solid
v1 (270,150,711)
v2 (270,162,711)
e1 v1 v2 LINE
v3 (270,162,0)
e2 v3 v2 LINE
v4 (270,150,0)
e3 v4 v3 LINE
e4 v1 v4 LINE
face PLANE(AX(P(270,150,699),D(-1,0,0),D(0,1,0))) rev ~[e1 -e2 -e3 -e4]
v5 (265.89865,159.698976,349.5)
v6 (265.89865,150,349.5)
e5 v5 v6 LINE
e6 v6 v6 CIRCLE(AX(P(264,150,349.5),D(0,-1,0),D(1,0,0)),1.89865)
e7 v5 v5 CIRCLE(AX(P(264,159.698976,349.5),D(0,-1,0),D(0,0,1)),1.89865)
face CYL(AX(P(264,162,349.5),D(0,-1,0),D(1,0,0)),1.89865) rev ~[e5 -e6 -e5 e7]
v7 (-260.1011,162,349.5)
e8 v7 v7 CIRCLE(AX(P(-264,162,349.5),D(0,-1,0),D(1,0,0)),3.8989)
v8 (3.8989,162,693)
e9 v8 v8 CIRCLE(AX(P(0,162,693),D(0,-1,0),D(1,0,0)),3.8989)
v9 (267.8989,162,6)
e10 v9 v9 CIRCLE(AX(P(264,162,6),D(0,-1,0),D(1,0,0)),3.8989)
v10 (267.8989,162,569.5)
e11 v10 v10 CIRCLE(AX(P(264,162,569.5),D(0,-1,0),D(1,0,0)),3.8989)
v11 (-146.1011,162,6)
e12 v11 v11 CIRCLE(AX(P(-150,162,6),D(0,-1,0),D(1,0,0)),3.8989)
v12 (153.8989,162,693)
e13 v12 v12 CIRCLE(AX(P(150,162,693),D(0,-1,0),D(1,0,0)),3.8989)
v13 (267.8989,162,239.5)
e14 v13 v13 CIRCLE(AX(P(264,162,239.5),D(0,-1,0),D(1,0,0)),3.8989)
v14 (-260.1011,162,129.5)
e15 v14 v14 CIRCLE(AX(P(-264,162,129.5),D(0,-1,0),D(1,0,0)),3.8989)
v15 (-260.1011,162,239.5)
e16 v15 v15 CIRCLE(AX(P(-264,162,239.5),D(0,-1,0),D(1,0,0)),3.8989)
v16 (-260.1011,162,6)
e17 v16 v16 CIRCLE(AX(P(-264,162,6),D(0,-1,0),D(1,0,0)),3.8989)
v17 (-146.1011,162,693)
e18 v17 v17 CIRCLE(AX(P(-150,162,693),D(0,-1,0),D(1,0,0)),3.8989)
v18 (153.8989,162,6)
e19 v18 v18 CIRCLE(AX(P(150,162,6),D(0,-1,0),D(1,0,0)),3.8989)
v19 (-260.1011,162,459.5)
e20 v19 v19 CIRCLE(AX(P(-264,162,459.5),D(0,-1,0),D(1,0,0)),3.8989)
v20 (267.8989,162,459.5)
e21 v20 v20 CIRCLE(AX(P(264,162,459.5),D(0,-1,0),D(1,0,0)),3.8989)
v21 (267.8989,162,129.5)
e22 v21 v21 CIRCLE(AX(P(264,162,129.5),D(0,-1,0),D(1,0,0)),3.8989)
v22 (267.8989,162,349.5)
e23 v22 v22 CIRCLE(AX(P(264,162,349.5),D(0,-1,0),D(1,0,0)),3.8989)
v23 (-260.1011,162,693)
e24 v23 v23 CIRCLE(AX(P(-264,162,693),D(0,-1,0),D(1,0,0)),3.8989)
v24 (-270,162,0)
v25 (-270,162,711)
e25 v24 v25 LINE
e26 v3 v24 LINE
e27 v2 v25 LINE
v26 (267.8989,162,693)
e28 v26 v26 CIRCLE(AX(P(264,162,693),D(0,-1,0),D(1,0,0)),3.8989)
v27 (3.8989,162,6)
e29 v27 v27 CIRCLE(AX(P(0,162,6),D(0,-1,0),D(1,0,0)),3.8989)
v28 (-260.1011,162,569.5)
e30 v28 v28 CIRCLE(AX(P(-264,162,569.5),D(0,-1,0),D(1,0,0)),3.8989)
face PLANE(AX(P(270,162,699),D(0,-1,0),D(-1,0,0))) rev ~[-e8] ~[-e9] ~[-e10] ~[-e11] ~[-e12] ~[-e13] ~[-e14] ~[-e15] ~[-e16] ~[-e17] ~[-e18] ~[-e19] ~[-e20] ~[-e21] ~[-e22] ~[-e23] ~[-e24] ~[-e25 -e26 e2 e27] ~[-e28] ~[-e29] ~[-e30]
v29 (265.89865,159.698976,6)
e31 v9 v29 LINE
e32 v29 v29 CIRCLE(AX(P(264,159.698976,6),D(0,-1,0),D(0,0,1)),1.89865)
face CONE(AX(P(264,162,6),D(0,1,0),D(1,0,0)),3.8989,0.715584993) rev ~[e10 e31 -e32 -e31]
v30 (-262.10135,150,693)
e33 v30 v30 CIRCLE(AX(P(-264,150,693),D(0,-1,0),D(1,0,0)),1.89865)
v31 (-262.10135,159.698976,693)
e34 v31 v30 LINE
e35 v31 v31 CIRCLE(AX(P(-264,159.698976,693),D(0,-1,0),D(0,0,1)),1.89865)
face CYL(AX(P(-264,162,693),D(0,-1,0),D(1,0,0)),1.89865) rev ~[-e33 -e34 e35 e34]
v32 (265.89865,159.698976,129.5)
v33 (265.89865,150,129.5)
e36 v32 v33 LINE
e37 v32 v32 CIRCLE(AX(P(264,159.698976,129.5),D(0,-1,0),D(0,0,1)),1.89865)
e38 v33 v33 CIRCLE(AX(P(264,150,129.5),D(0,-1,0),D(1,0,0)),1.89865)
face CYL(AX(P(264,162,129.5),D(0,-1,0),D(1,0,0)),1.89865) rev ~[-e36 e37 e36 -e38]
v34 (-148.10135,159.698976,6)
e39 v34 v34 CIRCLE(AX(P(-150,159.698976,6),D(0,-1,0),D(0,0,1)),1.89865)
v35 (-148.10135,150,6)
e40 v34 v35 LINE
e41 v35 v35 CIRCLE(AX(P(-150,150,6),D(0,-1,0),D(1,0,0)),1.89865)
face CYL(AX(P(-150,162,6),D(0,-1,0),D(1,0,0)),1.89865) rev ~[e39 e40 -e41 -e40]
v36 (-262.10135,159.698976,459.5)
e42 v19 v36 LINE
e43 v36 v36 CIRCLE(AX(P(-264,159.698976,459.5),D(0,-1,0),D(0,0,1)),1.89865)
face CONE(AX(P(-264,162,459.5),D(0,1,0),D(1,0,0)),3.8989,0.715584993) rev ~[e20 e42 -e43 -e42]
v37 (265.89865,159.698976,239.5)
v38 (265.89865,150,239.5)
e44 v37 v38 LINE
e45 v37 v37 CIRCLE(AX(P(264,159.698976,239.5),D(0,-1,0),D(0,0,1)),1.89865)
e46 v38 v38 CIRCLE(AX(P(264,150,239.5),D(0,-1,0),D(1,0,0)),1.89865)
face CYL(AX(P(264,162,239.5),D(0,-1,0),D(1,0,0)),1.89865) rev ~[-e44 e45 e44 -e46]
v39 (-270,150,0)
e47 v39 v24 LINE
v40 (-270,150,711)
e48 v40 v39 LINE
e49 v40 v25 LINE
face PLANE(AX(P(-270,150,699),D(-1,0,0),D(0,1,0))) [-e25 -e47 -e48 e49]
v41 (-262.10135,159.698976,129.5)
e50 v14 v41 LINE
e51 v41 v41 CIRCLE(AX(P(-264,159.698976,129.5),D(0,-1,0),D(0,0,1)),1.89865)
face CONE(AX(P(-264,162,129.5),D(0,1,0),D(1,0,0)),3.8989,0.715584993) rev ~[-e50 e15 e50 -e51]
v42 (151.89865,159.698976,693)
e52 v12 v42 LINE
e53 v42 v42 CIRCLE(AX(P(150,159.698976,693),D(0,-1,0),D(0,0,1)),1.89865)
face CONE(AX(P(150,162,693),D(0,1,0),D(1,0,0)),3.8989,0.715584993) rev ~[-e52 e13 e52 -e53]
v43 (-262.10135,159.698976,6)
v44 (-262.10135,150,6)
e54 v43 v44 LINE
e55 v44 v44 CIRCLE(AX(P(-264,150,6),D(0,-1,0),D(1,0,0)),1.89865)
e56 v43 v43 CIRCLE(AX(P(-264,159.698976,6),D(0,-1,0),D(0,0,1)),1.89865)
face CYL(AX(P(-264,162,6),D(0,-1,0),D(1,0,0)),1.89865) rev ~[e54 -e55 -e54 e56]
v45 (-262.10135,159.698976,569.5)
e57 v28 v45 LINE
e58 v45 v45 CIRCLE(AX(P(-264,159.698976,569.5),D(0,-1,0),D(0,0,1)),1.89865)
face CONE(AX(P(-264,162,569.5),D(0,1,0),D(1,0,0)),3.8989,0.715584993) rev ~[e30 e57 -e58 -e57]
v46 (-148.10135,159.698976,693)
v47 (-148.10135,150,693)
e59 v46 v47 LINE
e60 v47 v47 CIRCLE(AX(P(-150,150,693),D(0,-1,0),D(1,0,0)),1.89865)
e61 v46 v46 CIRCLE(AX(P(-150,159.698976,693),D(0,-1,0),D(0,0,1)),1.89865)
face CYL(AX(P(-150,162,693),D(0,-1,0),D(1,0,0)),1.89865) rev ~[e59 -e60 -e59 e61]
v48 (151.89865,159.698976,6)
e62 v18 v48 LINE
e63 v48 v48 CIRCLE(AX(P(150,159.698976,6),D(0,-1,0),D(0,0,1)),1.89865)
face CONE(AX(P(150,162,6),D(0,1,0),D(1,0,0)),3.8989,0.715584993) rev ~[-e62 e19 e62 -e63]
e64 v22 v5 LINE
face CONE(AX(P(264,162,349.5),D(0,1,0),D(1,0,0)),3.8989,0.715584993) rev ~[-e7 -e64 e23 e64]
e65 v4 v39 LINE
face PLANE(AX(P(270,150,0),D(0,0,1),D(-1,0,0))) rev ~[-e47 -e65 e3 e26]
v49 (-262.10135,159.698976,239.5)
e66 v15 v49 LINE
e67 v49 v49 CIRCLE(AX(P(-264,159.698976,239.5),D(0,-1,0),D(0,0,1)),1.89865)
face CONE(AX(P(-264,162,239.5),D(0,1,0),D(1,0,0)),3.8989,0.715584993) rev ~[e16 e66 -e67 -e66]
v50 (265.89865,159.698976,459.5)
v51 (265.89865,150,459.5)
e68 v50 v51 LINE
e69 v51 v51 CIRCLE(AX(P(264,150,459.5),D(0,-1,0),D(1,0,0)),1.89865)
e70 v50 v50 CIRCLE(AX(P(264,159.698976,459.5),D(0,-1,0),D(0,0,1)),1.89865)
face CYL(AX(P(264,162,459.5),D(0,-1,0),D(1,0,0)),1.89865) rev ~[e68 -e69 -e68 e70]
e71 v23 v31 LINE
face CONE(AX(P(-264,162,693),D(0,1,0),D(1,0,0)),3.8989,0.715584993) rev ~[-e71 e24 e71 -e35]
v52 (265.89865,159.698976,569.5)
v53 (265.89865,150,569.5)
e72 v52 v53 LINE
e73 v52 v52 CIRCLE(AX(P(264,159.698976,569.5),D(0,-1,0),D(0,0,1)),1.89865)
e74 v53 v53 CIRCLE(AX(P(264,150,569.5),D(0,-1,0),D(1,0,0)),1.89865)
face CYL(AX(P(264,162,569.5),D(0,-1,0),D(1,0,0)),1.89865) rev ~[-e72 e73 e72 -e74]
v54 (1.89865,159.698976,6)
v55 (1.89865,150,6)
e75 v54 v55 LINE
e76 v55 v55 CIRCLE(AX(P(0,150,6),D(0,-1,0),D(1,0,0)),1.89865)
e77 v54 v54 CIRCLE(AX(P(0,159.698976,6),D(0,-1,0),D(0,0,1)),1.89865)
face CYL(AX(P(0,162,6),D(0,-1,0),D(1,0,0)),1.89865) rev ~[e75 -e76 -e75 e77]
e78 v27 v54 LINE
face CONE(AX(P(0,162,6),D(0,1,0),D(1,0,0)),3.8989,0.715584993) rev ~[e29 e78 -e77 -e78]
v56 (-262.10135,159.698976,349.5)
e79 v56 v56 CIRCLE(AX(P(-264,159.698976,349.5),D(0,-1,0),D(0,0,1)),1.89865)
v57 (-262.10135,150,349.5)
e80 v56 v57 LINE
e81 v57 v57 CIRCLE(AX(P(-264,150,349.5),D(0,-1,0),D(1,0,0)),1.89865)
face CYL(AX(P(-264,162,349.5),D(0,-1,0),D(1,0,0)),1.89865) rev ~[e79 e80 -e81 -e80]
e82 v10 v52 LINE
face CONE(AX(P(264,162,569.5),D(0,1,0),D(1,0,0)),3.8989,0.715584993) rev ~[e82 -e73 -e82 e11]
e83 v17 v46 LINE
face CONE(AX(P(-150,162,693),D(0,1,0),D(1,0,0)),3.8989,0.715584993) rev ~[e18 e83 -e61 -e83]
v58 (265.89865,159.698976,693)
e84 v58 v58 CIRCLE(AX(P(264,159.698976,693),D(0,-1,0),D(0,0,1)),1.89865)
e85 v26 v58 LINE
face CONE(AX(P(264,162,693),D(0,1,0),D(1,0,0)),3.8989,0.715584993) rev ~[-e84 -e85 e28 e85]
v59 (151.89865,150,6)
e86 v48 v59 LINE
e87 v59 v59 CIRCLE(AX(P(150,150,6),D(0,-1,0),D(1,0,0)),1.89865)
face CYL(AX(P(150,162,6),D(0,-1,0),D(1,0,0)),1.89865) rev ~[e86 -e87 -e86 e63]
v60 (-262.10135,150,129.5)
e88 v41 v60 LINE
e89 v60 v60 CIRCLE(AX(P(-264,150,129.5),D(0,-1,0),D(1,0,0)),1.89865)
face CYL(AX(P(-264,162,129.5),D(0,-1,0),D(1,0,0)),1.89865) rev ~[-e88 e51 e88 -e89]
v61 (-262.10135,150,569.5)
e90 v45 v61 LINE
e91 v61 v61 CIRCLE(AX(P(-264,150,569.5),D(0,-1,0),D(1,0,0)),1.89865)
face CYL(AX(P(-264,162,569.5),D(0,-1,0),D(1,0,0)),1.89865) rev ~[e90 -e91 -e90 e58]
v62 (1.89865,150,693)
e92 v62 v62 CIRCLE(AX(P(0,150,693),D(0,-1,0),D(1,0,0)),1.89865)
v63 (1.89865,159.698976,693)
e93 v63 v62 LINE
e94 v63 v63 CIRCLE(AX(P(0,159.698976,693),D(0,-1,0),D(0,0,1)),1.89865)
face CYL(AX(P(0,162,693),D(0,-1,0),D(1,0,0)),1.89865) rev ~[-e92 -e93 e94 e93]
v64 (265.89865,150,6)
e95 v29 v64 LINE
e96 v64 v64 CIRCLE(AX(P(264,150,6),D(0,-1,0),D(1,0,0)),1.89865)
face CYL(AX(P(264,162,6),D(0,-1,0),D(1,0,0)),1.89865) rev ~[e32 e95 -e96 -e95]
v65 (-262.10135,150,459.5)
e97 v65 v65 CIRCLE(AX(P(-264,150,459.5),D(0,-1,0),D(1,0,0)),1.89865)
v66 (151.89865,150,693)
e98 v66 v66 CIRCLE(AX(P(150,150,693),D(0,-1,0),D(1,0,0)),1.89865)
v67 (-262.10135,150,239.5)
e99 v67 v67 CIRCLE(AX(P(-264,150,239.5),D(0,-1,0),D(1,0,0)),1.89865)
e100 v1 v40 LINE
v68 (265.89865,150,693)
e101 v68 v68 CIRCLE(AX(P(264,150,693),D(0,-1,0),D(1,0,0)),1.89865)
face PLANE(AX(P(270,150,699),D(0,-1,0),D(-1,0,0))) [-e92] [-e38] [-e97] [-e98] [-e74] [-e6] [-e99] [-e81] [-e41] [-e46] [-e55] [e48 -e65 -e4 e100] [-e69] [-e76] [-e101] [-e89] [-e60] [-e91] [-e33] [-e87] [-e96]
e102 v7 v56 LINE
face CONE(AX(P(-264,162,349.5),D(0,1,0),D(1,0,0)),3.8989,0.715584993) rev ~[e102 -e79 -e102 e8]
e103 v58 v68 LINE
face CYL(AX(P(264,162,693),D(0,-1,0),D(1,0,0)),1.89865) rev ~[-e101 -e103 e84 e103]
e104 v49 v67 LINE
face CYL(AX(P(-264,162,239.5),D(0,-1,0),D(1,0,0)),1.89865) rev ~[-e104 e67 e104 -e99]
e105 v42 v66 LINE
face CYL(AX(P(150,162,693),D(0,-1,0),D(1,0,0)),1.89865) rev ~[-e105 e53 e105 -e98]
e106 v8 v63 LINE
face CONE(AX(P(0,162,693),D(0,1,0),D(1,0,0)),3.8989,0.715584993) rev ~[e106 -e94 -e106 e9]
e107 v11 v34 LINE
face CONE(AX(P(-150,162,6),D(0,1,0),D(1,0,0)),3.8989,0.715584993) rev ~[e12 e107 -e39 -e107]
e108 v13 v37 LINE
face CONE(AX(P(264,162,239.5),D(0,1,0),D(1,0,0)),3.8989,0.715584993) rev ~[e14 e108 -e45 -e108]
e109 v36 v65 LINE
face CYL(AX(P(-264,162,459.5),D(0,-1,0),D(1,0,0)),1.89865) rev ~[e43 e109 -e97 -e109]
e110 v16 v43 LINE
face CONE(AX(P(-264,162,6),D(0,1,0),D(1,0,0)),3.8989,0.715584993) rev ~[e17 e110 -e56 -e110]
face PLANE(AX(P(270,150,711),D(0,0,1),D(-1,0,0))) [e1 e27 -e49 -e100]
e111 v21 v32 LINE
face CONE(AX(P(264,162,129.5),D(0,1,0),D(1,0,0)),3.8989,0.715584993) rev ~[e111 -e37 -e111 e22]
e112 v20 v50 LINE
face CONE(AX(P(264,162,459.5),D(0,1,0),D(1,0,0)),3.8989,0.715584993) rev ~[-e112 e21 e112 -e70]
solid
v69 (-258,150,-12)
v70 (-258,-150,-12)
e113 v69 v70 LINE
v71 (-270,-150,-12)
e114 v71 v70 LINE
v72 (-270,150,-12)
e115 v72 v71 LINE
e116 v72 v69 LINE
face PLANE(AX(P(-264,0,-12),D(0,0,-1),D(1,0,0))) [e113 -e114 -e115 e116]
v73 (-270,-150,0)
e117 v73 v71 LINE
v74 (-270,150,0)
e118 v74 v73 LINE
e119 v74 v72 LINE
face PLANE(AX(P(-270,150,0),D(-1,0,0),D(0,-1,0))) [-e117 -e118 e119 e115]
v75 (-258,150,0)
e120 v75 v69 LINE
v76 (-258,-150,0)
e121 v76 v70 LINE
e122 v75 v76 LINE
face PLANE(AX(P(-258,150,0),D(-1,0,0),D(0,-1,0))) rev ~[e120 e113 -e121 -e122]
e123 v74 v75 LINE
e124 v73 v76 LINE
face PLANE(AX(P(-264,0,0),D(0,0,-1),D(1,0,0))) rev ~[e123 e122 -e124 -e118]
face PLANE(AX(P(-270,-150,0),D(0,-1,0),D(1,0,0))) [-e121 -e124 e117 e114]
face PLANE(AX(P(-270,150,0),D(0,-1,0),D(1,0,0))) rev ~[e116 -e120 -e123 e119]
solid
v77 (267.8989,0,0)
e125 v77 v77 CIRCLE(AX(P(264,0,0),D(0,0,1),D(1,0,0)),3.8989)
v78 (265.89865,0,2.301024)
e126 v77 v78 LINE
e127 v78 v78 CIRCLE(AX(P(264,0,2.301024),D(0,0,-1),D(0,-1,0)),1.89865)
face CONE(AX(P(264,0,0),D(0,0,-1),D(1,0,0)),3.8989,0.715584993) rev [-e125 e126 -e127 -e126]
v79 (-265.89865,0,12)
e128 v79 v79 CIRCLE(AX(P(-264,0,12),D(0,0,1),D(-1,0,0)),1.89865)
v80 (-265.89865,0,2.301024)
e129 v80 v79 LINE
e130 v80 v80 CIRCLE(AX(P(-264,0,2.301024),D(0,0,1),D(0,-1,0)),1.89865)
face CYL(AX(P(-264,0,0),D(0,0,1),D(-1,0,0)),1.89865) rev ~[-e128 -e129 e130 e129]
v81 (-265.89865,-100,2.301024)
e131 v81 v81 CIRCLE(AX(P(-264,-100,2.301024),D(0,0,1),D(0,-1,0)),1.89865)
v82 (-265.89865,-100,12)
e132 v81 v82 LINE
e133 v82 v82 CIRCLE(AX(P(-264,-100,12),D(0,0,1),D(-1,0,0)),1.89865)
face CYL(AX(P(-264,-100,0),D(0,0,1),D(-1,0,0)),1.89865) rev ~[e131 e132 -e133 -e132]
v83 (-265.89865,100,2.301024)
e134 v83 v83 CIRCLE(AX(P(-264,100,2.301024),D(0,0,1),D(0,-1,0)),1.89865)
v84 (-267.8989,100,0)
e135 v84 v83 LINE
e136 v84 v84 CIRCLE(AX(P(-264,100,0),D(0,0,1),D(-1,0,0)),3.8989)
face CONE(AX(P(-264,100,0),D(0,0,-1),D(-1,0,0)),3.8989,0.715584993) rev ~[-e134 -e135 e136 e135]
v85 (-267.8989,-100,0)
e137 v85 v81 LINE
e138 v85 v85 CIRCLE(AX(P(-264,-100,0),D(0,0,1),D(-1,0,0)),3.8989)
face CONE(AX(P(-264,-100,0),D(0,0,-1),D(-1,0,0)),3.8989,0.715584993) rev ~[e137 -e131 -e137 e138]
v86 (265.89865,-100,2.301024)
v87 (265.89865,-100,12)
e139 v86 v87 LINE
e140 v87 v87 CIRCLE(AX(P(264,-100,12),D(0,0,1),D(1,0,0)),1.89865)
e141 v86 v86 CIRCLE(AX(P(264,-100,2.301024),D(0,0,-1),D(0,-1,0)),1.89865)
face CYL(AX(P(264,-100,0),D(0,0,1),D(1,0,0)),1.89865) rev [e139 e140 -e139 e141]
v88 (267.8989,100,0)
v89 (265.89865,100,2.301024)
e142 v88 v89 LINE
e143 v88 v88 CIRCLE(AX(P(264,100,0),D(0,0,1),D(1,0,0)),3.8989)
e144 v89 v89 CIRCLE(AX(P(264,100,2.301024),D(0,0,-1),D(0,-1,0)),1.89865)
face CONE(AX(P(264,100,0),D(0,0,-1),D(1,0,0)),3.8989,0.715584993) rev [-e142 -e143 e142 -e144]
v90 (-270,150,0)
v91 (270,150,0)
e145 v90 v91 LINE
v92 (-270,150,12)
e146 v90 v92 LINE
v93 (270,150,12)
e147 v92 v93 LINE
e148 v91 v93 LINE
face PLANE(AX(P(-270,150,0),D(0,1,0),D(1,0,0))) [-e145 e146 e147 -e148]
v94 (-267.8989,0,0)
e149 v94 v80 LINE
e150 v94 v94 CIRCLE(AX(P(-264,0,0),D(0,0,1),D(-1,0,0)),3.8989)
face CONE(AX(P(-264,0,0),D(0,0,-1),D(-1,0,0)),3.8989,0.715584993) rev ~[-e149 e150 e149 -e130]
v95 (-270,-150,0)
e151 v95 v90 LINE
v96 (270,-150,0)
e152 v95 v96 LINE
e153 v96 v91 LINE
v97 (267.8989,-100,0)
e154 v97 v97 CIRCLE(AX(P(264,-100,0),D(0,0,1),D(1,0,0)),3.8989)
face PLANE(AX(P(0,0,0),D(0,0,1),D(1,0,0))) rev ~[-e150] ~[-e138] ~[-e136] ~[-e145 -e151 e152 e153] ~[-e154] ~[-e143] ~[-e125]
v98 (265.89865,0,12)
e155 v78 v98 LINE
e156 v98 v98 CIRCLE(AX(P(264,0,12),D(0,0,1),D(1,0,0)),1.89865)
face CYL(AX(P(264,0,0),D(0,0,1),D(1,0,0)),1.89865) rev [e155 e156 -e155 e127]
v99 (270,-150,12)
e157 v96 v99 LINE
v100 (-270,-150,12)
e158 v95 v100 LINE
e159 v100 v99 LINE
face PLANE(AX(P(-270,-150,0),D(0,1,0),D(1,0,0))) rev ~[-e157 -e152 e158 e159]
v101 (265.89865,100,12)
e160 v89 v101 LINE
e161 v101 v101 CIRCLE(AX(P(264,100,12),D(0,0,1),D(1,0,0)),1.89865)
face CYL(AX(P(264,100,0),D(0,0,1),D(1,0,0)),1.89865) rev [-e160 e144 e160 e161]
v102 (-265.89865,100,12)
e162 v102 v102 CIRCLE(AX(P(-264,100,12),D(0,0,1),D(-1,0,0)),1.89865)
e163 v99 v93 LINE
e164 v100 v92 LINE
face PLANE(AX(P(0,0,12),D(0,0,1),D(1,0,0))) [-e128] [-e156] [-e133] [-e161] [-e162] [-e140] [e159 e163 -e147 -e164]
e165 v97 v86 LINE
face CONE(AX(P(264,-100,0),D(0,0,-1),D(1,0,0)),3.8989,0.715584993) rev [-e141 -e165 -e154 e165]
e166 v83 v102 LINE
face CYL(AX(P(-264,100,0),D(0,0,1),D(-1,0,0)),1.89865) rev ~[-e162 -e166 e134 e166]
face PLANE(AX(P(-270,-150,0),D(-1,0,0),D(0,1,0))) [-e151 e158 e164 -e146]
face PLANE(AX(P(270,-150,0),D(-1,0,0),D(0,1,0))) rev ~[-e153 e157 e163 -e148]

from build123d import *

# Parameters (mm, degrees)
F0_W           = 540
F0_H           = 300
F1_DEPTH       = 12
F3_D           = 3.7973
F3_CSINK_D     = 7.7978
F3_CSINK_ANGLE = 82
F4_W           = 540
F4_H           = 699
F5_DEPTH       = 12
F7_D           = 3.7973
F7_CSINK_D     = 7.7978
F7_CSINK_ANGLE = 82
F8_DEPTH       = 12
F9_W           = 12
F9_H           = 300
F10_DEPTH      = 12


# Not quite as in the source:
# - a pattern or mirror of a feature is missing from the dataset's text; its kind, count and spacing are read off the source's solid


with BuildPart() as f1:
    # F0 (on Top) → F1 (new body)
    with BuildSketch(Plane.XY):
        Rectangle(F0_W, F0_H)
    extrude(amount=F1_DEPTH)

    # F3 (through all)
    with Locations(Plane(origin=(0, 0, 0), x_dir=(1, 0, 0), z_dir=(0, 0, -1))):
        with Locations((-264, -100), (-264, 0), (-264, 100)):
            f3 = CounterSinkHole(F3_D / 2, F3_CSINK_D / 2, counter_sink_angle=F3_CSINK_ANGLE)

    # F3_copies: F3 across plane
    add(f3.mirror(Plane(origin=(0, 0, 0), x_dir=(0, 0, 1), z_dir=(1, 0, 0))), mode=Mode.SUBTRACT)


with BuildPart() as f5:
    # F4 (on face) → F5 (new body)
    with BuildSketch(Plane(origin=(0, 150, 0), x_dir=(-1, 0, 0), z_dir=(0, 1, 0))):
        with Locations((0, 349.5)):
            Rectangle(F4_W, F4_H)
    extrude(amount=F5_DEPTH)

    # F7 (through all)
    with Locations(Plane(origin=(0, 162, 0), x_dir=(-1, 0, 0), z_dir=(0, 1, 0))):
        with Locations((264, 129.5), (264, 239.5), (264, 349.5), (264, 459.5), (264, 569.5), (264, 693), (150, 693), (0, 693), (-150, 693), (-264, 693), (-264, 569.5), (-264, 459.5), (-264, 349.5), (-264, 239.5), (-264, 129.5), (-264, 6), (-150, 6), (0, 6), (150, 6), (264, 6)):
            CounterSinkHole(F7_D / 2, F7_CSINK_D / 2, counter_sink_angle=F7_CSINK_ANGLE)

    # F8 (add): a face of the model
    f8_faces = [f5.faces().sort_by_distance(p)[0] for p in [
        (0, 156, 699),
    ]]
    extrude(f8_faces, amount=F8_DEPTH)


with BuildPart() as f10:
    # F9 (on face) → F10 (new body)
    with BuildSketch(Plane(origin=(0, 0, 0), x_dir=(1, 0, 0), z_dir=(0, 0, -1))):
        with Locations((-264, 0)):
            Rectangle(F9_W, F9_H)
    extrude(amount=F10_DEPTH)


solid = Compound([f1.part, f5.part, f10.part])
